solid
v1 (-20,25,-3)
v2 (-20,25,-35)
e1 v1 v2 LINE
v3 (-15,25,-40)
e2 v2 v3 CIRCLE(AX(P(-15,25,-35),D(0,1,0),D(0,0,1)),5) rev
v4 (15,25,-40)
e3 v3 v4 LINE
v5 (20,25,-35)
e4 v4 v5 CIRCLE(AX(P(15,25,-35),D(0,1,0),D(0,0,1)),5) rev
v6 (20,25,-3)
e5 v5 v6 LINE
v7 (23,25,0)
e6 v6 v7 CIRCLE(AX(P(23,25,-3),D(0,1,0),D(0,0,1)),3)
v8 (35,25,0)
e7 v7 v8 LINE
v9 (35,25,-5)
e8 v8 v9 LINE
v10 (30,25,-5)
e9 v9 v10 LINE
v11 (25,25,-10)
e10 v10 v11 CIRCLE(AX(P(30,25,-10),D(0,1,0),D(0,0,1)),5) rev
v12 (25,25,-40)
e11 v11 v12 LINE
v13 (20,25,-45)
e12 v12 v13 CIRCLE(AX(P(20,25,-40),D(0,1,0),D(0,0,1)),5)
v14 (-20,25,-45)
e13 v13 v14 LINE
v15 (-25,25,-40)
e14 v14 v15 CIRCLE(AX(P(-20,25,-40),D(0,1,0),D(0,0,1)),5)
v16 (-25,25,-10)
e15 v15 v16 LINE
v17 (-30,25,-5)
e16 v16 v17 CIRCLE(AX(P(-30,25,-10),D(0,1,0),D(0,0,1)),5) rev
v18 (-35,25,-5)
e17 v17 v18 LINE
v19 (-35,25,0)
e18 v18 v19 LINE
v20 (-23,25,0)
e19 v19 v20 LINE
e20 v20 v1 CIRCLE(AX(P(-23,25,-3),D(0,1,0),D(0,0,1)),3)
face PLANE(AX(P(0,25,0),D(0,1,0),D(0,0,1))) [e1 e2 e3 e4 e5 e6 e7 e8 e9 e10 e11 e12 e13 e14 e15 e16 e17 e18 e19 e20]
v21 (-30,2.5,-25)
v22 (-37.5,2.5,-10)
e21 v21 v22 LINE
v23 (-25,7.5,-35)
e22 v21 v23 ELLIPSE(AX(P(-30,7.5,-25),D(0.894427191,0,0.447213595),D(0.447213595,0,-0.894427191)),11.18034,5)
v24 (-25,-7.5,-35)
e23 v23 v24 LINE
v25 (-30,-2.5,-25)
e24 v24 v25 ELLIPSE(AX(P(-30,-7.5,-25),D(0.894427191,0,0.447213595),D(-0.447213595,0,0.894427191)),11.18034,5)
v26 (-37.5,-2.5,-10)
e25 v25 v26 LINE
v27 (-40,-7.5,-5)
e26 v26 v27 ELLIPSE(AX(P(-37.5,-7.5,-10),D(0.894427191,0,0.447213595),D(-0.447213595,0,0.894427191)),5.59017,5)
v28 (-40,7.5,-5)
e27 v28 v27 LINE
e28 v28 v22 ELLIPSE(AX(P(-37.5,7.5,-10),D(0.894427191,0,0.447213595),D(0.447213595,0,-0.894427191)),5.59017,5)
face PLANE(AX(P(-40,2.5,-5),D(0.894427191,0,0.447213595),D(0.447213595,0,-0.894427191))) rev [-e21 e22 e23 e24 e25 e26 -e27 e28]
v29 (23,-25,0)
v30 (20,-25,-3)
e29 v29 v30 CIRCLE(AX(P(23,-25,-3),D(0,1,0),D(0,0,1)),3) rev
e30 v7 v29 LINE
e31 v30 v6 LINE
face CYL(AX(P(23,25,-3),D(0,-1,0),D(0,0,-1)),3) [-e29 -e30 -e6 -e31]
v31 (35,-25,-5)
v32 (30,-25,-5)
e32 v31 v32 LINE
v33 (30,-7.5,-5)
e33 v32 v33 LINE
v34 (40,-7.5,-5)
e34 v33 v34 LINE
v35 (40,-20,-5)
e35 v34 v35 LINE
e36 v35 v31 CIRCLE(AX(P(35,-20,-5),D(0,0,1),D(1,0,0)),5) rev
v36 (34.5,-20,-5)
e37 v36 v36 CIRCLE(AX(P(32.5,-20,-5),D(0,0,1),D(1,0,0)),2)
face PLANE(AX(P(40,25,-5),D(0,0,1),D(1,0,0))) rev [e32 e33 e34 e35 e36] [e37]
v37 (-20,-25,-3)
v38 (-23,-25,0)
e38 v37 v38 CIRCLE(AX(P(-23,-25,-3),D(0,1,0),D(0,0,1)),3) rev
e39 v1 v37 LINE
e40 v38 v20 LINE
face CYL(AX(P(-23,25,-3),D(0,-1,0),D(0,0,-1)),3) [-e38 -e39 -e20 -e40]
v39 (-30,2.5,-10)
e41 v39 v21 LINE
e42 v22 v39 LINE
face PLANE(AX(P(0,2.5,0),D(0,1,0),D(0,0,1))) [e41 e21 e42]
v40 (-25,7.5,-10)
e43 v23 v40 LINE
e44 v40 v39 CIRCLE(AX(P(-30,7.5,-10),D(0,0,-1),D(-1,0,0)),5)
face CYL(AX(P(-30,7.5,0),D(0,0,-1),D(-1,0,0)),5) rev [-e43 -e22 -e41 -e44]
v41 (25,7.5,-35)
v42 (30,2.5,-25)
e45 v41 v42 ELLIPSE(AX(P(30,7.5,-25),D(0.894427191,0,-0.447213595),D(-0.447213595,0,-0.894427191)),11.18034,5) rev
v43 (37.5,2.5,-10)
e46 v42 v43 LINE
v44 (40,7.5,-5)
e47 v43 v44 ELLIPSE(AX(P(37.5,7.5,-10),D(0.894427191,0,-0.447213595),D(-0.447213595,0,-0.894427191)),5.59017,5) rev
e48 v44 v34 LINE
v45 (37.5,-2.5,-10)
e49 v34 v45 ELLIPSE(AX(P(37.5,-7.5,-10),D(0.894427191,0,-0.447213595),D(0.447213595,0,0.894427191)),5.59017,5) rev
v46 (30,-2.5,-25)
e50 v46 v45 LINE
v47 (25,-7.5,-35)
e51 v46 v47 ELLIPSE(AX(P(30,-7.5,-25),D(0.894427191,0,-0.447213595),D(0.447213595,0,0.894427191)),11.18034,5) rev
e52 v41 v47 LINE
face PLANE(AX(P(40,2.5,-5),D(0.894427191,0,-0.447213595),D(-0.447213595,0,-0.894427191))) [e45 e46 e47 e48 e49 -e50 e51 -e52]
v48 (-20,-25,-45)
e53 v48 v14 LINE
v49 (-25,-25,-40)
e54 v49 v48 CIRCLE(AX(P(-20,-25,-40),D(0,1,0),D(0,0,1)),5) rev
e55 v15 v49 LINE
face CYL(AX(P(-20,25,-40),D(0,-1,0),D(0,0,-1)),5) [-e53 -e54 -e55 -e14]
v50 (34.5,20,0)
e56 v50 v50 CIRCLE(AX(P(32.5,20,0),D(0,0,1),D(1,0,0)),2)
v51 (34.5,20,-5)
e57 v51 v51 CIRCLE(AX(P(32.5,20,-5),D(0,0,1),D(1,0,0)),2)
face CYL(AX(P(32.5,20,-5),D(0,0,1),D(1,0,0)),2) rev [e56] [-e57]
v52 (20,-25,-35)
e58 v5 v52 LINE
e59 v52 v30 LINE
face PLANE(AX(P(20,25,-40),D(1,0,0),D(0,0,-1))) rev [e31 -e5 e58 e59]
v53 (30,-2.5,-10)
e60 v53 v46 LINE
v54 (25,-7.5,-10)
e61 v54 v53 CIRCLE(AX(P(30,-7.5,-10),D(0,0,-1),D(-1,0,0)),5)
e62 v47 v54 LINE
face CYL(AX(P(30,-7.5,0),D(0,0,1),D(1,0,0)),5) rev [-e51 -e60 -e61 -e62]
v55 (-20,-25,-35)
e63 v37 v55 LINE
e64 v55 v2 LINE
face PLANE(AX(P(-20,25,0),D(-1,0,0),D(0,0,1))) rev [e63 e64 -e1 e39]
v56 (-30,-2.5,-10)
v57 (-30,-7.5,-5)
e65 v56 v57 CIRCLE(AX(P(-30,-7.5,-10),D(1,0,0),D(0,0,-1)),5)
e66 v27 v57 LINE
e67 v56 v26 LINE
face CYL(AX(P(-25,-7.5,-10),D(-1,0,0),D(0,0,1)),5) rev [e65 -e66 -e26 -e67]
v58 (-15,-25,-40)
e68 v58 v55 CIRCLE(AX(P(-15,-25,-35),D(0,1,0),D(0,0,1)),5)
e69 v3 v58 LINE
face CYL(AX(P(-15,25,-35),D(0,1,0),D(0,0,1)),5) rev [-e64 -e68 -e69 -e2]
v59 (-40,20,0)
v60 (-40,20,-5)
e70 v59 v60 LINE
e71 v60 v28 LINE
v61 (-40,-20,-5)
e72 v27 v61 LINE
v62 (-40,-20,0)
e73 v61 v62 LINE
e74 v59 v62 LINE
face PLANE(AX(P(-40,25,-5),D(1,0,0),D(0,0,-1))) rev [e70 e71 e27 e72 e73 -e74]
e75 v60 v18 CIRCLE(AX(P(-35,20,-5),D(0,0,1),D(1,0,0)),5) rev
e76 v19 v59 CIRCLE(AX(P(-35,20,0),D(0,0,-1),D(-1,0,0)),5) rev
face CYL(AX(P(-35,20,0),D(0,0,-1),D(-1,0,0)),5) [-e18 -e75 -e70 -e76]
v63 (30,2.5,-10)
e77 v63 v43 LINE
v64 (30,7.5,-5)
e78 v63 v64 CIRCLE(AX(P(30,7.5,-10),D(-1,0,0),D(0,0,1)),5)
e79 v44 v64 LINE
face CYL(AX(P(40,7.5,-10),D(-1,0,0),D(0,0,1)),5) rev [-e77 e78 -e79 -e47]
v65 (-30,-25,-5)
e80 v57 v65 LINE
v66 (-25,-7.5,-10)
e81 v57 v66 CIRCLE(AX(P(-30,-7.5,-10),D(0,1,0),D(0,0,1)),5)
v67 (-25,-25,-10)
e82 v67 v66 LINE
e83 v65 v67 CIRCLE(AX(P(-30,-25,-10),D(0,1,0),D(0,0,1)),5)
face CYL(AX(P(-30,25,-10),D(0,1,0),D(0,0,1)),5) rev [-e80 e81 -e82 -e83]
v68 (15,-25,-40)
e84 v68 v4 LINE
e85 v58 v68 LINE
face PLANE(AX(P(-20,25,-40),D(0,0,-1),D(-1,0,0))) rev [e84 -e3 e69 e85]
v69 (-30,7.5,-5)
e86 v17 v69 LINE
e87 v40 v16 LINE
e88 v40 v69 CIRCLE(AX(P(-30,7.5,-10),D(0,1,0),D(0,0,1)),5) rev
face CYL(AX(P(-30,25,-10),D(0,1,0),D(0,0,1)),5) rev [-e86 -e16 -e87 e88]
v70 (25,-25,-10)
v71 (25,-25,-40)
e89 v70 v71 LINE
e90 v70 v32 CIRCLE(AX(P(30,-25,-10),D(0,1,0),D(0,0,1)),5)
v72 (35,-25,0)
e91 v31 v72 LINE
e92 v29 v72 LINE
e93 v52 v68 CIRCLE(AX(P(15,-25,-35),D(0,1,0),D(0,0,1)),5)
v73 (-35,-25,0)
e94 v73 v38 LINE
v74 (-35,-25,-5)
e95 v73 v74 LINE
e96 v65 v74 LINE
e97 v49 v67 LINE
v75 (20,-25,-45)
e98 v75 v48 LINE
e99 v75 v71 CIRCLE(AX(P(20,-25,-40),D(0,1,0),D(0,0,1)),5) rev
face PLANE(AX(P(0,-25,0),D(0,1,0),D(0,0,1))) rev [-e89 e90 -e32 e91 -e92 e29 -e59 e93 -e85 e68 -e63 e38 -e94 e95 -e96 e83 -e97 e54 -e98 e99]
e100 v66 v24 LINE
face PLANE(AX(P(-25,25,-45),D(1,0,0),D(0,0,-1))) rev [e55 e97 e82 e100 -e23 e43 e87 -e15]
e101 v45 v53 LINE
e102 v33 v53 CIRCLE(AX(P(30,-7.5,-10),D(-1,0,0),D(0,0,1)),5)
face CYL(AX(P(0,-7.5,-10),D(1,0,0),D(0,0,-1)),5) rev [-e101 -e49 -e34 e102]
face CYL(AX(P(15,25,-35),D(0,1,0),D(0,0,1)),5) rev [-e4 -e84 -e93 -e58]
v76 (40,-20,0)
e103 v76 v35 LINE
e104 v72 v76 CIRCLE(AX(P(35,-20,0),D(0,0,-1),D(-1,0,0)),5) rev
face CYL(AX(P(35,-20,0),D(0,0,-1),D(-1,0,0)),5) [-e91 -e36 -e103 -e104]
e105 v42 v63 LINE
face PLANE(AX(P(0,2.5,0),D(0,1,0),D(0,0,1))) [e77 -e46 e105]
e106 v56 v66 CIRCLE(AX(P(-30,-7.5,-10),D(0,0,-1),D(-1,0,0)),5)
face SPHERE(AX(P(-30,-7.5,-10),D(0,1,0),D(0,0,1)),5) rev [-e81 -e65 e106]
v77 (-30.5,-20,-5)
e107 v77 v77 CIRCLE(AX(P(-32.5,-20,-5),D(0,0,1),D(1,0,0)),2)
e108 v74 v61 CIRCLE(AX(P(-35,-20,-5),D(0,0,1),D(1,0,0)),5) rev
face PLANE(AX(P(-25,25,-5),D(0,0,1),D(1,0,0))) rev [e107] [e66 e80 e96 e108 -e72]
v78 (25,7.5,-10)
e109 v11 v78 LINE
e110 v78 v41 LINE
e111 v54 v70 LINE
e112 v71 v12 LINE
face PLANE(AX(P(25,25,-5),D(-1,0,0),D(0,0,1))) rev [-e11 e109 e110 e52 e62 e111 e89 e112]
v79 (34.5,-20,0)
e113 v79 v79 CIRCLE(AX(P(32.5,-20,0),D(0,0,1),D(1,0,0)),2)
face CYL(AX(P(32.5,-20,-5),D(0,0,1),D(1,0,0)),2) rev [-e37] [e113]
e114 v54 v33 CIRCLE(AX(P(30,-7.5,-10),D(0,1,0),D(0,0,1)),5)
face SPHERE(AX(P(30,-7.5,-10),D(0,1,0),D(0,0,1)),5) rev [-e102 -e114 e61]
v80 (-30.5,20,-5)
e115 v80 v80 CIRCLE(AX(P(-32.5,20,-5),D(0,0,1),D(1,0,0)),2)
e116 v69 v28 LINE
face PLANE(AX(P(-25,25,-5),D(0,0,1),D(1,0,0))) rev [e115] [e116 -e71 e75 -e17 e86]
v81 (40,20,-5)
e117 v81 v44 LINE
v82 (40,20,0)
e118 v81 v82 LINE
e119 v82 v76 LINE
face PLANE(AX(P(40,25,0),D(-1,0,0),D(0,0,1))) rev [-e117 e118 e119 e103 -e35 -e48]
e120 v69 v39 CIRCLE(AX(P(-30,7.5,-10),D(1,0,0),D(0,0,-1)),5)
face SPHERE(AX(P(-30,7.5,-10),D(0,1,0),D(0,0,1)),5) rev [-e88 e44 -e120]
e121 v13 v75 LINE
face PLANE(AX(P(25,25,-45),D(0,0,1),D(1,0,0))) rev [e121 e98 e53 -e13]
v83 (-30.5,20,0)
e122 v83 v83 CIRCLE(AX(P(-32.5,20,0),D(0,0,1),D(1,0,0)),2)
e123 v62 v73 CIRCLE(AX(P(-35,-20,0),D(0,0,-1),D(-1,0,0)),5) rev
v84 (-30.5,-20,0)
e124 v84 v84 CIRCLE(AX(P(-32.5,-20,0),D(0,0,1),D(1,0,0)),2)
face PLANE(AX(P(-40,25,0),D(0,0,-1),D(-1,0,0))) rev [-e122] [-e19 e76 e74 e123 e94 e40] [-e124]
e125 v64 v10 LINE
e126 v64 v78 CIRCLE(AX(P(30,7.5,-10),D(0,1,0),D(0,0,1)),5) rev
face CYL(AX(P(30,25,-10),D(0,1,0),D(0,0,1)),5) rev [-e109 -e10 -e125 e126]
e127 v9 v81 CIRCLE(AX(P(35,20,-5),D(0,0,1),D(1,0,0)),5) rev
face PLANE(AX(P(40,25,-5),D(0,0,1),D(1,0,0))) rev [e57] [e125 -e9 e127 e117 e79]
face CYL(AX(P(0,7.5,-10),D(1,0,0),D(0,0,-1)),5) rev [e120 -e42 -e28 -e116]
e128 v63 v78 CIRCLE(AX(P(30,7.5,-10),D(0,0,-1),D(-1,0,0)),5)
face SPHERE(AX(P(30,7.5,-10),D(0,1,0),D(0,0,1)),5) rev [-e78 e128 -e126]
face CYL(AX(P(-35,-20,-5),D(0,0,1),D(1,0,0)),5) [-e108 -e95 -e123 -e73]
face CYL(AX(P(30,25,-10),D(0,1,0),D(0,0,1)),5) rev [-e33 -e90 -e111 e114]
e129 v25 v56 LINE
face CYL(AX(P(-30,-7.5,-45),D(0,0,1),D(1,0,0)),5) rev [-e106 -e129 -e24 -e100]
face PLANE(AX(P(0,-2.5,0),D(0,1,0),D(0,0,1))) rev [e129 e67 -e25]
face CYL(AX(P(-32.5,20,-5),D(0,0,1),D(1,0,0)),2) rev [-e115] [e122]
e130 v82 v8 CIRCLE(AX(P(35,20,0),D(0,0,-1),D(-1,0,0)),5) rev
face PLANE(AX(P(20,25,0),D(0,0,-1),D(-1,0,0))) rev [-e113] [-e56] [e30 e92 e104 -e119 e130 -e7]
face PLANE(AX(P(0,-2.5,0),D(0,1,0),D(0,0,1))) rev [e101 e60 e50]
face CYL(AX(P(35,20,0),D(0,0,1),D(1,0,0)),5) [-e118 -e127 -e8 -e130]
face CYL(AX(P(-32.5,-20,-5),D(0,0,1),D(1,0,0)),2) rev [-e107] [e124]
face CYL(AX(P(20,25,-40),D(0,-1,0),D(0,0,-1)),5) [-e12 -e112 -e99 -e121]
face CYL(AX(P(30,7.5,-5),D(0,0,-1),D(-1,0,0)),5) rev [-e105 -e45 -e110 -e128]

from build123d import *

# Parameters (mm, degrees)
BOSS_EXTRUDE1_DEPTH = 25
FILLET1_R           = 5
SKETCH2_R           = 2
CUT_EXTRUDE1_DEPTH  = 5
FILLET2_R           = 5
BOSS_EXTRUDE2_DEPTH = 2.5
FILLET3_R           = 5
FILLET4_R           = 3


with BuildPart() as part:
    # Sketch1 → Boss-Extrude1 (new, symmetric)
    with BuildSketch(Plane(origin=(0, 0, 0), x_dir=(1, 0, 0), z_dir=(0, 1, 0))):
        Polygon((-40, 0), (-20, 0), (-20, 40), (20, 40), (20, 0), (40, 0), (40, 5), (25, 5), (25, 45), (-25, 45), (-25, 5), (-40, 5), align=None)
    extrude(amount=BOSS_EXTRUDE1_DEPTH, both=True)

    # Fillet1
    fillet1_edges = [part.edges().sort_by_distance(p)[0] for p in [
        (-25, 0, -5),
        (-25, 0, -45),
        (25, 0, -45),
        (25, 0, -5),
        (20, 0, -40),
        (-20, 0, -40),
    ]]
    fillet(fillet1_edges, radius=FILLET1_R)

    # Sketch2 → Cut-Extrude1 (cut)
    with BuildSketch(Plane.XY):
        with Locations((-32.5, 20)):
            Circle(SKETCH2_R)
        with Locations((-32.5, -20)):
            Circle(SKETCH2_R)
        with Locations((32.5, -20)):
            Circle(SKETCH2_R)
        with Locations((32.5, 20)):
            Circle(SKETCH2_R)
    extrude(amount=-CUT_EXTRUDE1_DEPTH, mode=Mode.SUBTRACT)

    # Fillet2
    fillet2_edges = [part.edges().sort_by_distance(p)[0] for p in [
        (40, -25, -2.5),
        (-40, -25, -2.5),
        (40, 25, -2.5),
        (-40, 25, -2.5),
    ]]
    fillet(fillet2_edges, radius=FILLET2_R)

    # Sketch3 → Boss-Extrude2 (add, symmetric)
    with BuildSketch(Plane(origin=(0, 0, 0), x_dir=(1, 0, 0), z_dir=(0, 1, 0))):
        Polygon((-40, 5), (-25, 35), (-25, 5), align=None)
    boss_extrude2 = extrude(amount=BOSS_EXTRUDE2_DEPTH, both=True)

    # Mirror5: Boss-Extrude2 across plane
    add(boss_extrude2.mirror(Plane(origin=(0, 0, 0), x_dir=(0, 0, 1), z_dir=(1, 0, 0))))

    # Fillet3
    # the kernel refuses this fillet: 5 mm, written as the material it adds along each edge
    with BuildSketch(Plane(origin=(-30, -2.5, -10), x_dir=(1, 0, 0), z_dir=(0, 0, -1))) as fillet3_piece_1:
        with BuildLine():
            CenterArc((5 - FILLET3_R, FILLET3_R), FILLET3_R, 270, 90)
            Line((5 - FILLET3_R, 0), (5, 0))
            Line((5, 0), (5, FILLET3_R))
        make_face()
    revolve(axis=Axis((-30, -2.5, -10), (0, -1, 0)), revolution_arc=90)
    with BuildSketch(Plane(origin=(-30, 2.5, -10), x_dir=(1, 0, 0), z_dir=(0, 0, -1))) as fillet3_piece_2:
        with BuildLine():
            CenterArc((5 - FILLET3_R, -FILLET3_R), FILLET3_R, 0, 90)
            Line((5 - FILLET3_R, 0), (5, 0))
            Line((5, 0), (5, -FILLET3_R))
        make_face()
    revolve(axis=Axis((-30, 2.5, -10), (0, -1, 0)), revolution_arc=90)
    with BuildSketch(Plane(origin=(-25, -2.5, -47.5), x_dir=(-1, 0, 0), z_dir=(0, 0, 1))) as fillet3_piece_3_section:
        with BuildLine():
            CenterArc((FILLET3_R, FILLET3_R), FILLET3_R, 180, 90)
            Line((0, FILLET3_R), (0, 0))
            Line((0, 0), (FILLET3_R, 0))
        make_face()
    fillet3_piece_3 = extrude(amount=37.5, mode=Mode.PRIVATE)
    fillet3_piece_3 = split(fillet3_piece_3, bisect_by=Plane(origin=(-30.617859864, -3.692357018, -23.764280273), z_dir=(0.894427190999916, 0, 0.44721359549995787)), keep=Keep.TOP, mode=Mode.PRIVATE)
    add(fillet3_piece_3)
    with BuildSketch(Plane(origin=(-25, 2.5, -47.5), x_dir=(0, 1, 0), z_dir=(0, 0, 1))) as fillet3_piece_4_section:
        with BuildLine():
            CenterArc((FILLET3_R, FILLET3_R), FILLET3_R, 180, 90)
            Line((0, FILLET3_R), (0, 0))
            Line((0, 0), (FILLET3_R, 0))
        make_face()
    fillet3_piece_4 = extrude(amount=37.5, mode=Mode.PRIVATE)
    fillet3_piece_4 = split(fillet3_piece_4, bisect_by=Plane(origin=(-30.617859864, 3.692357018, -23.764280273), z_dir=(0.894427190999916, 0, 0.44721359549995787)), keep=Keep.TOP, mode=Mode.PRIVATE)
    add(fillet3_piece_4)
    with BuildSketch(Plane(origin=(-30, 2.5, -5), x_dir=(0, 1, 0), z_dir=(-1, 0, 0))) as fillet3_piece_5_section:
        with BuildLine():
            CenterArc((FILLET3_R, FILLET3_R), FILLET3_R, 180, 90)
            Line((0, FILLET3_R), (0, 0))
            Line((0, 0), (FILLET3_R, 0))
        make_face()
    fillet3_piece_5 = extrude(amount=10, mode=Mode.PRIVATE)
    fillet3_piece_5 = split(fillet3_piece_5, bisect_by=Plane(origin=(-38.518002001, 3.668083757, -7.963995998), z_dir=(0.894427190999916, 0, 0.44721359549995787)), keep=Keep.TOP, mode=Mode.PRIVATE)
    add(fillet3_piece_5)
    with BuildSketch(Plane(origin=(-30, -2.5, -5), x_dir=(0, -1, 0), z_dir=(-1, 0, 0))) as fillet3_piece_6_section:
        with BuildLine():
            CenterArc((FILLET3_R, -FILLET3_R), FILLET3_R, 90, 90)
            Line((0, -FILLET3_R), (0, 0))
            Line((0, 0), (FILLET3_R, 0))
        make_face()
    fillet3_piece_6 = extrude(amount=10, mode=Mode.PRIVATE)
    fillet3_piece_6 = split(fillet3_piece_6, bisect_by=Plane(origin=(-38.518002001, -3.668083757, -7.963995998), z_dir=(0.894427190999916, 0, 0.44721359549995787)), keep=Keep.TOP, mode=Mode.PRIVATE)
    add(fillet3_piece_6)
    with BuildSketch(Plane(origin=(30, -2.5, -10), x_dir=(-1, 0, 0), z_dir=(0, 0, -1))) as fillet3_piece_7:
        with BuildLine():
            CenterArc((5 - FILLET3_R, -FILLET3_R), FILLET3_R, 0, 90)
            Line((5 - FILLET3_R, 0), (5, 0))
            Line((5, 0), (5, -FILLET3_R))
        make_face()
    revolve(axis=Axis((30, -2.5, -10), (0, 1, 0)), revolution_arc=90)
    with BuildSketch(Plane(origin=(30, 2.5, -10), x_dir=(-1, 0, 0), z_dir=(0, 0, -1))) as fillet3_piece_8:
        with BuildLine():
            CenterArc((5 - FILLET3_R, FILLET3_R), FILLET3_R, 270, 90)
            Line((5, FILLET3_R), (5, 0))
            Line((5, 0), (5 - FILLET3_R, 0))
        make_face()
    revolve(axis=Axis((30, 2.5, -10), (0, 1, 0)), revolution_arc=90)
    with BuildSketch(Plane(origin=(25, 2.5, -47.5), x_dir=(0, 1, 0), z_dir=(0, 0, 1))) as fillet3_piece_9_section:
        with BuildLine():
            CenterArc((FILLET3_R, -FILLET3_R), FILLET3_R, 90, 90)
            Line((0, -FILLET3_R), (0, 0))
            Line((0, 0), (FILLET3_R, 0))
        make_face()
    fillet3_piece_9 = extrude(amount=37.5, mode=Mode.PRIVATE)
    fillet3_piece_9 = split(fillet3_piece_9, bisect_by=Plane(origin=(30.617859864, 3.692357018, -23.764280273), z_dir=(-0.894427190999916, 0, 0.44721359549995787)), keep=Keep.TOP, mode=Mode.PRIVATE)
    add(fillet3_piece_9)
    with BuildSketch(Plane(origin=(30, -2.5, -5), x_dir=(0, -1, 0), z_dir=(1, 0, 0))) as fillet3_piece_10_section:
        with BuildLine():
            CenterArc((FILLET3_R, FILLET3_R), FILLET3_R, 180, 90)
            Line((0, FILLET3_R), (0, 0))
            Line((0, 0), (FILLET3_R, 0))
        make_face()
    fillet3_piece_10 = extrude(amount=10, mode=Mode.PRIVATE)
    fillet3_piece_10 = split(fillet3_piece_10, bisect_by=Plane(origin=(38.518002001, -3.668083757, -7.963995998), z_dir=(-0.894427190999916, 0, 0.44721359549995787)), keep=Keep.TOP, mode=Mode.PRIVATE)
    add(fillet3_piece_10)
    with BuildSketch(Plane(origin=(25, -2.5, -47.5), x_dir=(0, -1, 0), z_dir=(0, 0, 1))) as fillet3_piece_11_section:
        with BuildLine():
            CenterArc((FILLET3_R, FILLET3_R), FILLET3_R, 180, 90)
            Line((0, FILLET3_R), (0, 0))
            Line((0, 0), (FILLET3_R, 0))
        make_face()
    fillet3_piece_11 = extrude(amount=37.5, mode=Mode.PRIVATE)
    fillet3_piece_11 = split(fillet3_piece_11, bisect_by=Plane(origin=(30.617859864, -3.692357018, -23.764280273), z_dir=(-0.894427190999916, 0, 0.44721359549995787)), keep=Keep.TOP, mode=Mode.PRIVATE)
    add(fillet3_piece_11)
    with BuildSketch(Plane(origin=(30, 2.5, -5), x_dir=(0, 0, -1), z_dir=(1, 0, 0))) as fillet3_piece_12_section:
        with BuildLine():
            CenterArc((FILLET3_R, FILLET3_R), FILLET3_R, 180, 90)
            Line((0, FILLET3_R), (0, 0))
            Line((0, 0), (FILLET3_R, 0))
        make_face()
    fillet3_piece_12 = extrude(amount=10, mode=Mode.PRIVATE)
    fillet3_piece_12 = split(fillet3_piece_12, bisect_by=Plane(origin=(38.518002001, 3.668083757, -7.963995998), z_dir=(-0.894427190999916, 0, 0.44721359549995787)), keep=Keep.TOP, mode=Mode.PRIVATE)
    add(fillet3_piece_12)

    # Fillet4
    fillet4_edges = [part.edges().sort_by_distance(p)[0] for p in [
        (20, 0, 0),
        (-20, 0, 0),
    ]]
    fillet(fillet4_edges, radius=FILLET4_R)


solid = part.part
